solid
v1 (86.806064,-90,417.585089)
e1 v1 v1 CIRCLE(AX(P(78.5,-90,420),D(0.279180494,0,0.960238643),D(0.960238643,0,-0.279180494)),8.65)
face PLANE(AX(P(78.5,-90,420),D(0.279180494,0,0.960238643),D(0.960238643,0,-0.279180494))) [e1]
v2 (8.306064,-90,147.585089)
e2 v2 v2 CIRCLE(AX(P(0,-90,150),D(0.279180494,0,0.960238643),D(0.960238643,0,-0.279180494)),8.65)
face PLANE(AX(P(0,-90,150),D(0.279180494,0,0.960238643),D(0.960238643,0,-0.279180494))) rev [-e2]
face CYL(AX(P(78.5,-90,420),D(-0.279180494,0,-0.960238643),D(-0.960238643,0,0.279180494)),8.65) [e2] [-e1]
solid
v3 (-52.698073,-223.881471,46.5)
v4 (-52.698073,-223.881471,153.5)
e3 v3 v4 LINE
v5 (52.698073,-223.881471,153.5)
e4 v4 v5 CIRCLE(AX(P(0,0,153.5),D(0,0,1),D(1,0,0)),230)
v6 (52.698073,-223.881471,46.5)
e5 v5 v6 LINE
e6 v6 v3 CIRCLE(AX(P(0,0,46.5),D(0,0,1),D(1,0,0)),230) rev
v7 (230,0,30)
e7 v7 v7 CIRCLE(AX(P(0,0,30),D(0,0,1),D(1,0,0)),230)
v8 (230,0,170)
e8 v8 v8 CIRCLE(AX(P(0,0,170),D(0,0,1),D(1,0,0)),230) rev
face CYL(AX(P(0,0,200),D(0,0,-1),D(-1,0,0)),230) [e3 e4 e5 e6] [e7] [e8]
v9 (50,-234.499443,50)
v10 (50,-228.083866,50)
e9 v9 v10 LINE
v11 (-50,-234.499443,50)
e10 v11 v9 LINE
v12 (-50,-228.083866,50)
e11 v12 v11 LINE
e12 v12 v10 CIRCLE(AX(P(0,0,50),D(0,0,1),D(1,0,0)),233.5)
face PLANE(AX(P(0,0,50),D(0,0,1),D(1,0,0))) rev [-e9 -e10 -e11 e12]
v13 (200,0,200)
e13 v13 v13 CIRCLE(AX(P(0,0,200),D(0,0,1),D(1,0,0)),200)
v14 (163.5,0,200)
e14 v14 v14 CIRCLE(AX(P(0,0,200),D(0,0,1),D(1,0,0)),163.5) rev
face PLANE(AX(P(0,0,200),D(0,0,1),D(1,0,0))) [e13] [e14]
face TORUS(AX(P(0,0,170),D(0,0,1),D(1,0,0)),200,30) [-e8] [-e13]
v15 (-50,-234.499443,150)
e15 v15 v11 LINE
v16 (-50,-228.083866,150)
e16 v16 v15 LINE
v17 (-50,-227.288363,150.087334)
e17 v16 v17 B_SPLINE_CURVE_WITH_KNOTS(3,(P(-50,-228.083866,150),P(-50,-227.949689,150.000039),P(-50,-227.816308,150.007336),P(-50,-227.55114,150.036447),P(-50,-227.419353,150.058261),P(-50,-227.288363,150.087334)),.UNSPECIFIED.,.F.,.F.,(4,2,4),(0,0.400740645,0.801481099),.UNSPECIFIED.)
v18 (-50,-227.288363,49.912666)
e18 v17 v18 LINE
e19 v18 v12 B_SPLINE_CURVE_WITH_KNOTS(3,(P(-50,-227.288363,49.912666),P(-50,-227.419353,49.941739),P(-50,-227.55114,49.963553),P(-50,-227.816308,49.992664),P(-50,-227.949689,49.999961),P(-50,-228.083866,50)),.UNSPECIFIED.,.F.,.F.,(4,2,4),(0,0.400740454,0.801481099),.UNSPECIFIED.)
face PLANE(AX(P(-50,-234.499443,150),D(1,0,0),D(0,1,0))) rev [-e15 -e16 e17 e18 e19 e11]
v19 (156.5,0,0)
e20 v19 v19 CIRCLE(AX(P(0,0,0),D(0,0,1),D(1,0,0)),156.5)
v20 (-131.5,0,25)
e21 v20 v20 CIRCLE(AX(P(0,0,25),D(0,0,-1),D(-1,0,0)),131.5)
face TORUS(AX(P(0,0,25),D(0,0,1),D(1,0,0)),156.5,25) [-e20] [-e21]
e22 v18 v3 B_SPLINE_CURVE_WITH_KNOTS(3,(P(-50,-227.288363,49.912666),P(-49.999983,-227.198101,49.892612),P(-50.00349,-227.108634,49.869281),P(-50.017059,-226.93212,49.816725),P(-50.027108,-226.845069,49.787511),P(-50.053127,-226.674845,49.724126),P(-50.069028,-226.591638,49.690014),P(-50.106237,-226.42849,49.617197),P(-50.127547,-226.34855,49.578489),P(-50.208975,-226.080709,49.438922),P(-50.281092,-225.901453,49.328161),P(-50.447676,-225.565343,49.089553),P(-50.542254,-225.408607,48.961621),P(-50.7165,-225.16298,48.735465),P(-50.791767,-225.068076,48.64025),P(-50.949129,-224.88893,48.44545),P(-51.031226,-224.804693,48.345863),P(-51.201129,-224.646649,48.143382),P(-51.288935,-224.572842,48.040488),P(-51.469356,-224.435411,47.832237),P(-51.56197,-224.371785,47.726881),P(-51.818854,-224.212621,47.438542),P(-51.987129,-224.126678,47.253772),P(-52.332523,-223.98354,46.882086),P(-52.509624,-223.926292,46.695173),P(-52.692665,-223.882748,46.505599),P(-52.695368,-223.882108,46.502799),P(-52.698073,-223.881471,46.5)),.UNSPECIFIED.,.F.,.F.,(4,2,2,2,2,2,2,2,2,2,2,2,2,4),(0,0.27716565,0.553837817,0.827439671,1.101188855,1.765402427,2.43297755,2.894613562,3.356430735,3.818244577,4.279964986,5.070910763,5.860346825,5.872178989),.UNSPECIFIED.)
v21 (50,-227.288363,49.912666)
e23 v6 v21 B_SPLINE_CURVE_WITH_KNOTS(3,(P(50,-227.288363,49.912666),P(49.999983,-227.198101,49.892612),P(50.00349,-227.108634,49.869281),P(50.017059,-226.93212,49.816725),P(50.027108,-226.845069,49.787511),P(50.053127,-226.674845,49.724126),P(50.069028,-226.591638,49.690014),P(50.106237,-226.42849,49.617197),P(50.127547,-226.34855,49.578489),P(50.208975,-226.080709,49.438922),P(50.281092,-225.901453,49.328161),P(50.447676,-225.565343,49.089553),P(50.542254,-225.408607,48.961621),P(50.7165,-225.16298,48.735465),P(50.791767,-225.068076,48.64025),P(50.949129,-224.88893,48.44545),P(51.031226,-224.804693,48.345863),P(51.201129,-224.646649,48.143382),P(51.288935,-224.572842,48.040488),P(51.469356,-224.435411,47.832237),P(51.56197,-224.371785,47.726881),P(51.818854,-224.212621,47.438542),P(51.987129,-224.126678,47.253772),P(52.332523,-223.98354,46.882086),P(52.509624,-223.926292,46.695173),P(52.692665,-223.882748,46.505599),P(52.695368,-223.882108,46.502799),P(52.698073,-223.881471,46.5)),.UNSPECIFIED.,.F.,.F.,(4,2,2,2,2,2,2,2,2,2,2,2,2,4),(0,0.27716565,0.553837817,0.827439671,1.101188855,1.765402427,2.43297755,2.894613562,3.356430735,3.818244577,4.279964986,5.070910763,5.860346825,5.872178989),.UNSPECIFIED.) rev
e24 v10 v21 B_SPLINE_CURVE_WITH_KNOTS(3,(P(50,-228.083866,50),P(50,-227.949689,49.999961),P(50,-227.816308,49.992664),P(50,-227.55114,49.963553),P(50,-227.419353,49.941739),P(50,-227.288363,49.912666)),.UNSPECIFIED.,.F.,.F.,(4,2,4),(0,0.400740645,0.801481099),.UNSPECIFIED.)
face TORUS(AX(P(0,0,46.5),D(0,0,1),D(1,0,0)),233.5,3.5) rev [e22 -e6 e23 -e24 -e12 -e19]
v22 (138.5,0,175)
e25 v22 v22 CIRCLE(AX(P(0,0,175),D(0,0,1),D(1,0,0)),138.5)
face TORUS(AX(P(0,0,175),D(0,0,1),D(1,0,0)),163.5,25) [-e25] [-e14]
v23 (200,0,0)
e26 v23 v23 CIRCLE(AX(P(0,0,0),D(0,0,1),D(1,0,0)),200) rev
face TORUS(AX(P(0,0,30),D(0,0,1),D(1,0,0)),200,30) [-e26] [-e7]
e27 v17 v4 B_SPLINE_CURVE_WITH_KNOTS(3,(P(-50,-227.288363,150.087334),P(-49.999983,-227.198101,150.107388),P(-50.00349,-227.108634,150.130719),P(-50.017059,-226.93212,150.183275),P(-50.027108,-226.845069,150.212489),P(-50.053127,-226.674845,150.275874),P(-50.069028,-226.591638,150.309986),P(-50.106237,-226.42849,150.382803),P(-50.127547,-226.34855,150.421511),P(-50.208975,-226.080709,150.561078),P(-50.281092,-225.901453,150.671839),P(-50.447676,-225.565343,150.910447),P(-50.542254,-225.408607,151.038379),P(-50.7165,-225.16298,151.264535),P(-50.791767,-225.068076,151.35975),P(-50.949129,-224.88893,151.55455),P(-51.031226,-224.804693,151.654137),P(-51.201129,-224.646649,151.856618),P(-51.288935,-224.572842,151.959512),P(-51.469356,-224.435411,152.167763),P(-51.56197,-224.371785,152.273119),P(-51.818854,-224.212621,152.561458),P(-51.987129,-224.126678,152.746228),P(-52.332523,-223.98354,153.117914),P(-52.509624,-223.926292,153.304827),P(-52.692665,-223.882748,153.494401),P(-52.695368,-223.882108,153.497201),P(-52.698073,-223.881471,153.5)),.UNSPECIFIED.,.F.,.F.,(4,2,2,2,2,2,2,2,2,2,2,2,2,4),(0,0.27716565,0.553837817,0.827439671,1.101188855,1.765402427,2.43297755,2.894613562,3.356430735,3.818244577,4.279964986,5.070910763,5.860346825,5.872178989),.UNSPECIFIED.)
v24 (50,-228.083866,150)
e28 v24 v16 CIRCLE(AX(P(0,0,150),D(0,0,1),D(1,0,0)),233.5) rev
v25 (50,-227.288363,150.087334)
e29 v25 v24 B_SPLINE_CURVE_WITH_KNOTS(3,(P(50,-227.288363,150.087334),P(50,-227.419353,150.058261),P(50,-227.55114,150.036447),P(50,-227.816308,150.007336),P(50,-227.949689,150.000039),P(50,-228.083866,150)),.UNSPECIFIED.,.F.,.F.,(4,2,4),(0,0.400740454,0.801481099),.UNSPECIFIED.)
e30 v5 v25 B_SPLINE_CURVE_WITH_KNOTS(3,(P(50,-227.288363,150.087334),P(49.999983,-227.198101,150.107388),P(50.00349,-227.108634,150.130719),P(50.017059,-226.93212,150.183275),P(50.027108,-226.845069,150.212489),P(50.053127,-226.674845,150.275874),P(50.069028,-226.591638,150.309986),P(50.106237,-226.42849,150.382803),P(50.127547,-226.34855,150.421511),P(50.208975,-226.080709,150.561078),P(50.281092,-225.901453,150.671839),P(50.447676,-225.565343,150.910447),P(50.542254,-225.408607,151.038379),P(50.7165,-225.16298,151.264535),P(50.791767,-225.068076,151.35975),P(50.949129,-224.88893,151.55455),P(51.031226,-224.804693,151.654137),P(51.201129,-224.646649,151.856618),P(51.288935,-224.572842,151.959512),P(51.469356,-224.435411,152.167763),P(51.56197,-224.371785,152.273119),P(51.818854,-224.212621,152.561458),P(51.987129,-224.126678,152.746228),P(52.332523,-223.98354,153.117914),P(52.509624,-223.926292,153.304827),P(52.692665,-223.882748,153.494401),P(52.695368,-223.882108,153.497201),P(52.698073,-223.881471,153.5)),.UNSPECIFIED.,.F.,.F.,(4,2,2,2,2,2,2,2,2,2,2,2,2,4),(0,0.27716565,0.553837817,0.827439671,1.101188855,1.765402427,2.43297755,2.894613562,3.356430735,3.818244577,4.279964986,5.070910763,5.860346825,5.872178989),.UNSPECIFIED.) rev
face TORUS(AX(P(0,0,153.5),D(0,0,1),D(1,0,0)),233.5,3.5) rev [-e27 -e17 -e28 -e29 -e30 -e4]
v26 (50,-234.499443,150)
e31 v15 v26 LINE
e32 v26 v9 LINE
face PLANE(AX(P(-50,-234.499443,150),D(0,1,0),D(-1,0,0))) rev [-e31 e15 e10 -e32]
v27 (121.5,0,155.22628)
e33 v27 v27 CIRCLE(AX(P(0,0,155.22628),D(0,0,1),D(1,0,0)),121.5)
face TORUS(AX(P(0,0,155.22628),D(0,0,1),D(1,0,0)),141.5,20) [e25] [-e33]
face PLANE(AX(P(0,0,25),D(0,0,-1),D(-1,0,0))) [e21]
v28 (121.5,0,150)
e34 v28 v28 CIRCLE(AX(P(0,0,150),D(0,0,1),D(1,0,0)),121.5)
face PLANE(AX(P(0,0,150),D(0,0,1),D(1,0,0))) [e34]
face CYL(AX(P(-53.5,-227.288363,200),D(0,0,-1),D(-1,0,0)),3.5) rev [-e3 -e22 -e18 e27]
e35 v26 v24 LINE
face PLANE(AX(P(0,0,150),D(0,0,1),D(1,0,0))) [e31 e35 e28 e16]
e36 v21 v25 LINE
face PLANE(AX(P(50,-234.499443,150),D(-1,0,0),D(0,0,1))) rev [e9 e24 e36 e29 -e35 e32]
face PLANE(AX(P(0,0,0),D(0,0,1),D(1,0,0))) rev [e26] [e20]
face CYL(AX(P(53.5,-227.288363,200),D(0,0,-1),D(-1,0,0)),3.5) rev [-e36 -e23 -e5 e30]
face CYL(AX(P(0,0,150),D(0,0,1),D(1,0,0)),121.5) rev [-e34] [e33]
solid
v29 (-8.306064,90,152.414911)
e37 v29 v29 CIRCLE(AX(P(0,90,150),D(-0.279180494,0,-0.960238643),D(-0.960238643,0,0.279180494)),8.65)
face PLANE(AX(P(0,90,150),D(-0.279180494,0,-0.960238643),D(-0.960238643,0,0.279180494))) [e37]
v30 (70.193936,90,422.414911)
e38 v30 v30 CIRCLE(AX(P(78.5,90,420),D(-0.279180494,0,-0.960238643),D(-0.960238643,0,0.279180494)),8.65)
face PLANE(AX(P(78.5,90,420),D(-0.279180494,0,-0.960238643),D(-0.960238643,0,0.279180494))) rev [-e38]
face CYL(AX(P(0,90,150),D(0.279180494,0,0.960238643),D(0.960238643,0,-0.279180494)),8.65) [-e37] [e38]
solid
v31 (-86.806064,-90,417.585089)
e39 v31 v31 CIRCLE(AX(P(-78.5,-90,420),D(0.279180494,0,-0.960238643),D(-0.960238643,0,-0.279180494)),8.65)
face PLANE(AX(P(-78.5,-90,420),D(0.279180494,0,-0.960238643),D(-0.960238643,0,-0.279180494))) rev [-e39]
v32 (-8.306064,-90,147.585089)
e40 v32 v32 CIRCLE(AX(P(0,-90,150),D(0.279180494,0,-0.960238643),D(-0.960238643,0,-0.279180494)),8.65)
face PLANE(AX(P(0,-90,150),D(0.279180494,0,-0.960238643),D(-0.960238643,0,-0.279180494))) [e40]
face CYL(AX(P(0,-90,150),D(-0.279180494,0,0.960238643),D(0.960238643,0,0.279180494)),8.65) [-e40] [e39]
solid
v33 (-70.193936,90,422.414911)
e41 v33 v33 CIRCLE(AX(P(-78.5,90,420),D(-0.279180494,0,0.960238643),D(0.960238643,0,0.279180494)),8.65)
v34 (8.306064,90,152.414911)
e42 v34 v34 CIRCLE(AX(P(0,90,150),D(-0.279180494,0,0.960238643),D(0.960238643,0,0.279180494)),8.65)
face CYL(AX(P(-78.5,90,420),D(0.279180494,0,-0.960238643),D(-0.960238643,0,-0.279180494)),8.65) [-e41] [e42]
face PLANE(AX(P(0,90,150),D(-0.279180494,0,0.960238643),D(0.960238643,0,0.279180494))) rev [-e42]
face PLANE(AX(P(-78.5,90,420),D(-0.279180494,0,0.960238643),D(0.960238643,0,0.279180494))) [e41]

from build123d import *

# Parameters (mm, degrees)
SKETCH_1_R               = 230
EXTRUDE_1_DEPTH          = 200
SKETCH_4_R               = 138.5
CUT_EXTRUDE_1_DEPTH      = 25
SKETCH_5_R               = 121.5
CUT_EXTRUDE_2_DEPTH      = 25
SKETCH_6_R               = 131.5
CUT_EXTRUDE_3_DEPTH      = 25
FILLET_1_R               = 25
FILLET_2_R               = 20
FILLET_3_R               = 30
SKETCH_11_ON_SEGMENT_1_R = 8.65
F_17_3_CIRCLE_1_DEPTH    = 281.180102425
SKETCH_11_R              = 8.65
F_17_3_CIRCLE_1_2_DEPTH  = 281.180102425
SKETCH_12_ON_SEGMENT_1_R = 8.65
F_17_3_CIRCLE_2_DEPTH    = 281.180102425
SKETCH_12_R              = 8.65
F_17_3_CIRCLE_2_2_DEPTH  = 281.180102425
EXTRUDE_2_DEPTH          = 50
FILLET_5_R               = 3.5


# Some blends are built 0.0001 mm under size
with BuildPart() as part:
    # 스케치1 → 보스-돌출1 (new body)
    with BuildSketch(Plane.XY):
        Circle(SKETCH_1_R)
    extrude(amount=EXTRUDE_1_DEPTH)

    # 스케치4 → 컷-돌출1 (cut)
    with BuildSketch(Plane.XY.offset(200)):
        Circle(SKETCH_4_R)
    extrude(amount=-CUT_EXTRUDE_1_DEPTH, mode=Mode.SUBTRACT)

    # 스케치5 → 컷-돌출2 (cut)
    with BuildSketch(Plane.XY.offset(175)):
        Circle(SKETCH_5_R)
    extrude(amount=-CUT_EXTRUDE_2_DEPTH, mode=Mode.SUBTRACT)

    # 스케치6 → 컷-돌출3 (cut)
    with BuildSketch(Plane(origin=(0, 0, 0), x_dir=(-1, 0, 0), z_dir=(0, 0, -1))):
        Circle(SKETCH_6_R)
    extrude(amount=-CUT_EXTRUDE_3_DEPTH, mode=Mode.SUBTRACT)

    # 필렛1
    fillet_1_edges = [part.edges().sort_by_distance(p)[0] for p in [
        (131.5, 0, 0),
        (-138.5, 0, 200),
    ]]
    fillet(fillet_1_edges, radius=FILLET_1_R - 0.0001)  # a hair under: the kernel refuses the full size

    # 필렛2
    # the kernel refuses this fillet: 20 mm, written as the material it takes off along each edge
    with BuildSketch(Plane(origin=(0, 0, 175), x_dir=(1, 0, 0), z_dir=(0, -1, 0))) as fillet_2_piece_1:
        with BuildLine():
            CenterArc((141.5, -19.773719933), FILLET_2_R, 98.626926559, 81.373073441)
            Line((121.5, -19.773719933), (121.1, -19.773719933))
            Line((121.1, -19.773719933), (121.1, 0))
            Line((121.1, 0), (121.5, 0.4))
            ThreePointArc((121.5, 0.4), (130, 0.4), (138.44, 0.395474399))
            Line((138.44, 0.395474399), (138.5, 0))
        make_face()
    revolve(axis=Axis((0, 0, 175), (0, 0, 1)), mode=Mode.SUBTRACT)

    # 필렛3
    fillet_3_edges = [part.edges().sort_by_distance(p)[0] for p in [
        (-230, 0, 0),
        (-230, 0, 200),
    ]]
    fillet(fillet_3_edges, radius=FILLET_3_R)

    # 스케치16 → 보스-돌출2 (add, symmetric)
    with BuildSketch(Plane.XY.offset(100)):
        with BuildLine():
            Line((-50, -234.499443206), (50, -234.499443206))
            Line((50, -234.499443206), (50, -224.499443206))
            ThreePointArc((50, -224.499443206), (0, -230), (-50, -224.499443206))
            Line((-50, -224.499443206), (-50, -234.499443206))
        make_face()
    extrude(amount=EXTRUDE_2_DEPTH, both=True)

    # 필렛5
    fillet_5_edges = [part.edges().sort_by_distance(p)[0] for p in [
        (-50, -224.499443206, 100),
        (0, -230, 50),
        (50, -224.499443206, 100),
        (0, -230, 150),
    ]]
    fillet(fillet_5_edges, radius=FILLET_5_R)


with BuildPart() as body_2:
    # 스케치11 on segment 1 (carried to segment 1) → 종류 17.3_CIRCLE(1) (new body)
    with BuildSketch(Plane(origin=(78.5, 90, 420), x_dir=(-0.960238643, 0, 0.279180494), z_dir=(-0.279180494, 0, -0.960238643))):
        Circle(SKETCH_11_ON_SEGMENT_1_R)
    extrude(amount=F_17_3_CIRCLE_1_DEPTH)


with BuildPart() as body_3:
    # 스케치11 → 17.3_CIRCLE_1 2 (new body)
    with BuildSketch(Plane(origin=(0, 90, 150), x_dir=(0.9602386430297387, 0, 0.27918049436234993), z_dir=(-0.27918049436234993, 0, 0.9602386430297387))):
        Circle(SKETCH_11_R)
    extrude(amount=F_17_3_CIRCLE_1_2_DEPTH)


with BuildPart() as body_4:
    # 스케치12 on segment 1 (carried to segment 1) → 종류 17.3_CIRCLE(2) (new body)
    with BuildSketch(Plane(origin=(-78.5, -90, 420), x_dir=(-0.960238643, 0, -0.279180494), z_dir=(0.279180494, 0, -0.960238643))):
        Circle(SKETCH_12_ON_SEGMENT_1_R)
    extrude(amount=F_17_3_CIRCLE_2_DEPTH)


with BuildPart() as body_5:
    # 스케치12 → 17.3_CIRCLE_2 2 (new body)
    with BuildSketch(Plane(origin=(0, -90, 150), x_dir=(0.9602386430297387, 0, -0.27918049436234993), z_dir=(0.27918049436234993, 0, 0.9602386430297387))):
        Circle(SKETCH_12_R)
    extrude(amount=F_17_3_CIRCLE_2_2_DEPTH)


solid = Compound([part.part, body_2.part, body_3.part, body_4.part, body_5.part])
